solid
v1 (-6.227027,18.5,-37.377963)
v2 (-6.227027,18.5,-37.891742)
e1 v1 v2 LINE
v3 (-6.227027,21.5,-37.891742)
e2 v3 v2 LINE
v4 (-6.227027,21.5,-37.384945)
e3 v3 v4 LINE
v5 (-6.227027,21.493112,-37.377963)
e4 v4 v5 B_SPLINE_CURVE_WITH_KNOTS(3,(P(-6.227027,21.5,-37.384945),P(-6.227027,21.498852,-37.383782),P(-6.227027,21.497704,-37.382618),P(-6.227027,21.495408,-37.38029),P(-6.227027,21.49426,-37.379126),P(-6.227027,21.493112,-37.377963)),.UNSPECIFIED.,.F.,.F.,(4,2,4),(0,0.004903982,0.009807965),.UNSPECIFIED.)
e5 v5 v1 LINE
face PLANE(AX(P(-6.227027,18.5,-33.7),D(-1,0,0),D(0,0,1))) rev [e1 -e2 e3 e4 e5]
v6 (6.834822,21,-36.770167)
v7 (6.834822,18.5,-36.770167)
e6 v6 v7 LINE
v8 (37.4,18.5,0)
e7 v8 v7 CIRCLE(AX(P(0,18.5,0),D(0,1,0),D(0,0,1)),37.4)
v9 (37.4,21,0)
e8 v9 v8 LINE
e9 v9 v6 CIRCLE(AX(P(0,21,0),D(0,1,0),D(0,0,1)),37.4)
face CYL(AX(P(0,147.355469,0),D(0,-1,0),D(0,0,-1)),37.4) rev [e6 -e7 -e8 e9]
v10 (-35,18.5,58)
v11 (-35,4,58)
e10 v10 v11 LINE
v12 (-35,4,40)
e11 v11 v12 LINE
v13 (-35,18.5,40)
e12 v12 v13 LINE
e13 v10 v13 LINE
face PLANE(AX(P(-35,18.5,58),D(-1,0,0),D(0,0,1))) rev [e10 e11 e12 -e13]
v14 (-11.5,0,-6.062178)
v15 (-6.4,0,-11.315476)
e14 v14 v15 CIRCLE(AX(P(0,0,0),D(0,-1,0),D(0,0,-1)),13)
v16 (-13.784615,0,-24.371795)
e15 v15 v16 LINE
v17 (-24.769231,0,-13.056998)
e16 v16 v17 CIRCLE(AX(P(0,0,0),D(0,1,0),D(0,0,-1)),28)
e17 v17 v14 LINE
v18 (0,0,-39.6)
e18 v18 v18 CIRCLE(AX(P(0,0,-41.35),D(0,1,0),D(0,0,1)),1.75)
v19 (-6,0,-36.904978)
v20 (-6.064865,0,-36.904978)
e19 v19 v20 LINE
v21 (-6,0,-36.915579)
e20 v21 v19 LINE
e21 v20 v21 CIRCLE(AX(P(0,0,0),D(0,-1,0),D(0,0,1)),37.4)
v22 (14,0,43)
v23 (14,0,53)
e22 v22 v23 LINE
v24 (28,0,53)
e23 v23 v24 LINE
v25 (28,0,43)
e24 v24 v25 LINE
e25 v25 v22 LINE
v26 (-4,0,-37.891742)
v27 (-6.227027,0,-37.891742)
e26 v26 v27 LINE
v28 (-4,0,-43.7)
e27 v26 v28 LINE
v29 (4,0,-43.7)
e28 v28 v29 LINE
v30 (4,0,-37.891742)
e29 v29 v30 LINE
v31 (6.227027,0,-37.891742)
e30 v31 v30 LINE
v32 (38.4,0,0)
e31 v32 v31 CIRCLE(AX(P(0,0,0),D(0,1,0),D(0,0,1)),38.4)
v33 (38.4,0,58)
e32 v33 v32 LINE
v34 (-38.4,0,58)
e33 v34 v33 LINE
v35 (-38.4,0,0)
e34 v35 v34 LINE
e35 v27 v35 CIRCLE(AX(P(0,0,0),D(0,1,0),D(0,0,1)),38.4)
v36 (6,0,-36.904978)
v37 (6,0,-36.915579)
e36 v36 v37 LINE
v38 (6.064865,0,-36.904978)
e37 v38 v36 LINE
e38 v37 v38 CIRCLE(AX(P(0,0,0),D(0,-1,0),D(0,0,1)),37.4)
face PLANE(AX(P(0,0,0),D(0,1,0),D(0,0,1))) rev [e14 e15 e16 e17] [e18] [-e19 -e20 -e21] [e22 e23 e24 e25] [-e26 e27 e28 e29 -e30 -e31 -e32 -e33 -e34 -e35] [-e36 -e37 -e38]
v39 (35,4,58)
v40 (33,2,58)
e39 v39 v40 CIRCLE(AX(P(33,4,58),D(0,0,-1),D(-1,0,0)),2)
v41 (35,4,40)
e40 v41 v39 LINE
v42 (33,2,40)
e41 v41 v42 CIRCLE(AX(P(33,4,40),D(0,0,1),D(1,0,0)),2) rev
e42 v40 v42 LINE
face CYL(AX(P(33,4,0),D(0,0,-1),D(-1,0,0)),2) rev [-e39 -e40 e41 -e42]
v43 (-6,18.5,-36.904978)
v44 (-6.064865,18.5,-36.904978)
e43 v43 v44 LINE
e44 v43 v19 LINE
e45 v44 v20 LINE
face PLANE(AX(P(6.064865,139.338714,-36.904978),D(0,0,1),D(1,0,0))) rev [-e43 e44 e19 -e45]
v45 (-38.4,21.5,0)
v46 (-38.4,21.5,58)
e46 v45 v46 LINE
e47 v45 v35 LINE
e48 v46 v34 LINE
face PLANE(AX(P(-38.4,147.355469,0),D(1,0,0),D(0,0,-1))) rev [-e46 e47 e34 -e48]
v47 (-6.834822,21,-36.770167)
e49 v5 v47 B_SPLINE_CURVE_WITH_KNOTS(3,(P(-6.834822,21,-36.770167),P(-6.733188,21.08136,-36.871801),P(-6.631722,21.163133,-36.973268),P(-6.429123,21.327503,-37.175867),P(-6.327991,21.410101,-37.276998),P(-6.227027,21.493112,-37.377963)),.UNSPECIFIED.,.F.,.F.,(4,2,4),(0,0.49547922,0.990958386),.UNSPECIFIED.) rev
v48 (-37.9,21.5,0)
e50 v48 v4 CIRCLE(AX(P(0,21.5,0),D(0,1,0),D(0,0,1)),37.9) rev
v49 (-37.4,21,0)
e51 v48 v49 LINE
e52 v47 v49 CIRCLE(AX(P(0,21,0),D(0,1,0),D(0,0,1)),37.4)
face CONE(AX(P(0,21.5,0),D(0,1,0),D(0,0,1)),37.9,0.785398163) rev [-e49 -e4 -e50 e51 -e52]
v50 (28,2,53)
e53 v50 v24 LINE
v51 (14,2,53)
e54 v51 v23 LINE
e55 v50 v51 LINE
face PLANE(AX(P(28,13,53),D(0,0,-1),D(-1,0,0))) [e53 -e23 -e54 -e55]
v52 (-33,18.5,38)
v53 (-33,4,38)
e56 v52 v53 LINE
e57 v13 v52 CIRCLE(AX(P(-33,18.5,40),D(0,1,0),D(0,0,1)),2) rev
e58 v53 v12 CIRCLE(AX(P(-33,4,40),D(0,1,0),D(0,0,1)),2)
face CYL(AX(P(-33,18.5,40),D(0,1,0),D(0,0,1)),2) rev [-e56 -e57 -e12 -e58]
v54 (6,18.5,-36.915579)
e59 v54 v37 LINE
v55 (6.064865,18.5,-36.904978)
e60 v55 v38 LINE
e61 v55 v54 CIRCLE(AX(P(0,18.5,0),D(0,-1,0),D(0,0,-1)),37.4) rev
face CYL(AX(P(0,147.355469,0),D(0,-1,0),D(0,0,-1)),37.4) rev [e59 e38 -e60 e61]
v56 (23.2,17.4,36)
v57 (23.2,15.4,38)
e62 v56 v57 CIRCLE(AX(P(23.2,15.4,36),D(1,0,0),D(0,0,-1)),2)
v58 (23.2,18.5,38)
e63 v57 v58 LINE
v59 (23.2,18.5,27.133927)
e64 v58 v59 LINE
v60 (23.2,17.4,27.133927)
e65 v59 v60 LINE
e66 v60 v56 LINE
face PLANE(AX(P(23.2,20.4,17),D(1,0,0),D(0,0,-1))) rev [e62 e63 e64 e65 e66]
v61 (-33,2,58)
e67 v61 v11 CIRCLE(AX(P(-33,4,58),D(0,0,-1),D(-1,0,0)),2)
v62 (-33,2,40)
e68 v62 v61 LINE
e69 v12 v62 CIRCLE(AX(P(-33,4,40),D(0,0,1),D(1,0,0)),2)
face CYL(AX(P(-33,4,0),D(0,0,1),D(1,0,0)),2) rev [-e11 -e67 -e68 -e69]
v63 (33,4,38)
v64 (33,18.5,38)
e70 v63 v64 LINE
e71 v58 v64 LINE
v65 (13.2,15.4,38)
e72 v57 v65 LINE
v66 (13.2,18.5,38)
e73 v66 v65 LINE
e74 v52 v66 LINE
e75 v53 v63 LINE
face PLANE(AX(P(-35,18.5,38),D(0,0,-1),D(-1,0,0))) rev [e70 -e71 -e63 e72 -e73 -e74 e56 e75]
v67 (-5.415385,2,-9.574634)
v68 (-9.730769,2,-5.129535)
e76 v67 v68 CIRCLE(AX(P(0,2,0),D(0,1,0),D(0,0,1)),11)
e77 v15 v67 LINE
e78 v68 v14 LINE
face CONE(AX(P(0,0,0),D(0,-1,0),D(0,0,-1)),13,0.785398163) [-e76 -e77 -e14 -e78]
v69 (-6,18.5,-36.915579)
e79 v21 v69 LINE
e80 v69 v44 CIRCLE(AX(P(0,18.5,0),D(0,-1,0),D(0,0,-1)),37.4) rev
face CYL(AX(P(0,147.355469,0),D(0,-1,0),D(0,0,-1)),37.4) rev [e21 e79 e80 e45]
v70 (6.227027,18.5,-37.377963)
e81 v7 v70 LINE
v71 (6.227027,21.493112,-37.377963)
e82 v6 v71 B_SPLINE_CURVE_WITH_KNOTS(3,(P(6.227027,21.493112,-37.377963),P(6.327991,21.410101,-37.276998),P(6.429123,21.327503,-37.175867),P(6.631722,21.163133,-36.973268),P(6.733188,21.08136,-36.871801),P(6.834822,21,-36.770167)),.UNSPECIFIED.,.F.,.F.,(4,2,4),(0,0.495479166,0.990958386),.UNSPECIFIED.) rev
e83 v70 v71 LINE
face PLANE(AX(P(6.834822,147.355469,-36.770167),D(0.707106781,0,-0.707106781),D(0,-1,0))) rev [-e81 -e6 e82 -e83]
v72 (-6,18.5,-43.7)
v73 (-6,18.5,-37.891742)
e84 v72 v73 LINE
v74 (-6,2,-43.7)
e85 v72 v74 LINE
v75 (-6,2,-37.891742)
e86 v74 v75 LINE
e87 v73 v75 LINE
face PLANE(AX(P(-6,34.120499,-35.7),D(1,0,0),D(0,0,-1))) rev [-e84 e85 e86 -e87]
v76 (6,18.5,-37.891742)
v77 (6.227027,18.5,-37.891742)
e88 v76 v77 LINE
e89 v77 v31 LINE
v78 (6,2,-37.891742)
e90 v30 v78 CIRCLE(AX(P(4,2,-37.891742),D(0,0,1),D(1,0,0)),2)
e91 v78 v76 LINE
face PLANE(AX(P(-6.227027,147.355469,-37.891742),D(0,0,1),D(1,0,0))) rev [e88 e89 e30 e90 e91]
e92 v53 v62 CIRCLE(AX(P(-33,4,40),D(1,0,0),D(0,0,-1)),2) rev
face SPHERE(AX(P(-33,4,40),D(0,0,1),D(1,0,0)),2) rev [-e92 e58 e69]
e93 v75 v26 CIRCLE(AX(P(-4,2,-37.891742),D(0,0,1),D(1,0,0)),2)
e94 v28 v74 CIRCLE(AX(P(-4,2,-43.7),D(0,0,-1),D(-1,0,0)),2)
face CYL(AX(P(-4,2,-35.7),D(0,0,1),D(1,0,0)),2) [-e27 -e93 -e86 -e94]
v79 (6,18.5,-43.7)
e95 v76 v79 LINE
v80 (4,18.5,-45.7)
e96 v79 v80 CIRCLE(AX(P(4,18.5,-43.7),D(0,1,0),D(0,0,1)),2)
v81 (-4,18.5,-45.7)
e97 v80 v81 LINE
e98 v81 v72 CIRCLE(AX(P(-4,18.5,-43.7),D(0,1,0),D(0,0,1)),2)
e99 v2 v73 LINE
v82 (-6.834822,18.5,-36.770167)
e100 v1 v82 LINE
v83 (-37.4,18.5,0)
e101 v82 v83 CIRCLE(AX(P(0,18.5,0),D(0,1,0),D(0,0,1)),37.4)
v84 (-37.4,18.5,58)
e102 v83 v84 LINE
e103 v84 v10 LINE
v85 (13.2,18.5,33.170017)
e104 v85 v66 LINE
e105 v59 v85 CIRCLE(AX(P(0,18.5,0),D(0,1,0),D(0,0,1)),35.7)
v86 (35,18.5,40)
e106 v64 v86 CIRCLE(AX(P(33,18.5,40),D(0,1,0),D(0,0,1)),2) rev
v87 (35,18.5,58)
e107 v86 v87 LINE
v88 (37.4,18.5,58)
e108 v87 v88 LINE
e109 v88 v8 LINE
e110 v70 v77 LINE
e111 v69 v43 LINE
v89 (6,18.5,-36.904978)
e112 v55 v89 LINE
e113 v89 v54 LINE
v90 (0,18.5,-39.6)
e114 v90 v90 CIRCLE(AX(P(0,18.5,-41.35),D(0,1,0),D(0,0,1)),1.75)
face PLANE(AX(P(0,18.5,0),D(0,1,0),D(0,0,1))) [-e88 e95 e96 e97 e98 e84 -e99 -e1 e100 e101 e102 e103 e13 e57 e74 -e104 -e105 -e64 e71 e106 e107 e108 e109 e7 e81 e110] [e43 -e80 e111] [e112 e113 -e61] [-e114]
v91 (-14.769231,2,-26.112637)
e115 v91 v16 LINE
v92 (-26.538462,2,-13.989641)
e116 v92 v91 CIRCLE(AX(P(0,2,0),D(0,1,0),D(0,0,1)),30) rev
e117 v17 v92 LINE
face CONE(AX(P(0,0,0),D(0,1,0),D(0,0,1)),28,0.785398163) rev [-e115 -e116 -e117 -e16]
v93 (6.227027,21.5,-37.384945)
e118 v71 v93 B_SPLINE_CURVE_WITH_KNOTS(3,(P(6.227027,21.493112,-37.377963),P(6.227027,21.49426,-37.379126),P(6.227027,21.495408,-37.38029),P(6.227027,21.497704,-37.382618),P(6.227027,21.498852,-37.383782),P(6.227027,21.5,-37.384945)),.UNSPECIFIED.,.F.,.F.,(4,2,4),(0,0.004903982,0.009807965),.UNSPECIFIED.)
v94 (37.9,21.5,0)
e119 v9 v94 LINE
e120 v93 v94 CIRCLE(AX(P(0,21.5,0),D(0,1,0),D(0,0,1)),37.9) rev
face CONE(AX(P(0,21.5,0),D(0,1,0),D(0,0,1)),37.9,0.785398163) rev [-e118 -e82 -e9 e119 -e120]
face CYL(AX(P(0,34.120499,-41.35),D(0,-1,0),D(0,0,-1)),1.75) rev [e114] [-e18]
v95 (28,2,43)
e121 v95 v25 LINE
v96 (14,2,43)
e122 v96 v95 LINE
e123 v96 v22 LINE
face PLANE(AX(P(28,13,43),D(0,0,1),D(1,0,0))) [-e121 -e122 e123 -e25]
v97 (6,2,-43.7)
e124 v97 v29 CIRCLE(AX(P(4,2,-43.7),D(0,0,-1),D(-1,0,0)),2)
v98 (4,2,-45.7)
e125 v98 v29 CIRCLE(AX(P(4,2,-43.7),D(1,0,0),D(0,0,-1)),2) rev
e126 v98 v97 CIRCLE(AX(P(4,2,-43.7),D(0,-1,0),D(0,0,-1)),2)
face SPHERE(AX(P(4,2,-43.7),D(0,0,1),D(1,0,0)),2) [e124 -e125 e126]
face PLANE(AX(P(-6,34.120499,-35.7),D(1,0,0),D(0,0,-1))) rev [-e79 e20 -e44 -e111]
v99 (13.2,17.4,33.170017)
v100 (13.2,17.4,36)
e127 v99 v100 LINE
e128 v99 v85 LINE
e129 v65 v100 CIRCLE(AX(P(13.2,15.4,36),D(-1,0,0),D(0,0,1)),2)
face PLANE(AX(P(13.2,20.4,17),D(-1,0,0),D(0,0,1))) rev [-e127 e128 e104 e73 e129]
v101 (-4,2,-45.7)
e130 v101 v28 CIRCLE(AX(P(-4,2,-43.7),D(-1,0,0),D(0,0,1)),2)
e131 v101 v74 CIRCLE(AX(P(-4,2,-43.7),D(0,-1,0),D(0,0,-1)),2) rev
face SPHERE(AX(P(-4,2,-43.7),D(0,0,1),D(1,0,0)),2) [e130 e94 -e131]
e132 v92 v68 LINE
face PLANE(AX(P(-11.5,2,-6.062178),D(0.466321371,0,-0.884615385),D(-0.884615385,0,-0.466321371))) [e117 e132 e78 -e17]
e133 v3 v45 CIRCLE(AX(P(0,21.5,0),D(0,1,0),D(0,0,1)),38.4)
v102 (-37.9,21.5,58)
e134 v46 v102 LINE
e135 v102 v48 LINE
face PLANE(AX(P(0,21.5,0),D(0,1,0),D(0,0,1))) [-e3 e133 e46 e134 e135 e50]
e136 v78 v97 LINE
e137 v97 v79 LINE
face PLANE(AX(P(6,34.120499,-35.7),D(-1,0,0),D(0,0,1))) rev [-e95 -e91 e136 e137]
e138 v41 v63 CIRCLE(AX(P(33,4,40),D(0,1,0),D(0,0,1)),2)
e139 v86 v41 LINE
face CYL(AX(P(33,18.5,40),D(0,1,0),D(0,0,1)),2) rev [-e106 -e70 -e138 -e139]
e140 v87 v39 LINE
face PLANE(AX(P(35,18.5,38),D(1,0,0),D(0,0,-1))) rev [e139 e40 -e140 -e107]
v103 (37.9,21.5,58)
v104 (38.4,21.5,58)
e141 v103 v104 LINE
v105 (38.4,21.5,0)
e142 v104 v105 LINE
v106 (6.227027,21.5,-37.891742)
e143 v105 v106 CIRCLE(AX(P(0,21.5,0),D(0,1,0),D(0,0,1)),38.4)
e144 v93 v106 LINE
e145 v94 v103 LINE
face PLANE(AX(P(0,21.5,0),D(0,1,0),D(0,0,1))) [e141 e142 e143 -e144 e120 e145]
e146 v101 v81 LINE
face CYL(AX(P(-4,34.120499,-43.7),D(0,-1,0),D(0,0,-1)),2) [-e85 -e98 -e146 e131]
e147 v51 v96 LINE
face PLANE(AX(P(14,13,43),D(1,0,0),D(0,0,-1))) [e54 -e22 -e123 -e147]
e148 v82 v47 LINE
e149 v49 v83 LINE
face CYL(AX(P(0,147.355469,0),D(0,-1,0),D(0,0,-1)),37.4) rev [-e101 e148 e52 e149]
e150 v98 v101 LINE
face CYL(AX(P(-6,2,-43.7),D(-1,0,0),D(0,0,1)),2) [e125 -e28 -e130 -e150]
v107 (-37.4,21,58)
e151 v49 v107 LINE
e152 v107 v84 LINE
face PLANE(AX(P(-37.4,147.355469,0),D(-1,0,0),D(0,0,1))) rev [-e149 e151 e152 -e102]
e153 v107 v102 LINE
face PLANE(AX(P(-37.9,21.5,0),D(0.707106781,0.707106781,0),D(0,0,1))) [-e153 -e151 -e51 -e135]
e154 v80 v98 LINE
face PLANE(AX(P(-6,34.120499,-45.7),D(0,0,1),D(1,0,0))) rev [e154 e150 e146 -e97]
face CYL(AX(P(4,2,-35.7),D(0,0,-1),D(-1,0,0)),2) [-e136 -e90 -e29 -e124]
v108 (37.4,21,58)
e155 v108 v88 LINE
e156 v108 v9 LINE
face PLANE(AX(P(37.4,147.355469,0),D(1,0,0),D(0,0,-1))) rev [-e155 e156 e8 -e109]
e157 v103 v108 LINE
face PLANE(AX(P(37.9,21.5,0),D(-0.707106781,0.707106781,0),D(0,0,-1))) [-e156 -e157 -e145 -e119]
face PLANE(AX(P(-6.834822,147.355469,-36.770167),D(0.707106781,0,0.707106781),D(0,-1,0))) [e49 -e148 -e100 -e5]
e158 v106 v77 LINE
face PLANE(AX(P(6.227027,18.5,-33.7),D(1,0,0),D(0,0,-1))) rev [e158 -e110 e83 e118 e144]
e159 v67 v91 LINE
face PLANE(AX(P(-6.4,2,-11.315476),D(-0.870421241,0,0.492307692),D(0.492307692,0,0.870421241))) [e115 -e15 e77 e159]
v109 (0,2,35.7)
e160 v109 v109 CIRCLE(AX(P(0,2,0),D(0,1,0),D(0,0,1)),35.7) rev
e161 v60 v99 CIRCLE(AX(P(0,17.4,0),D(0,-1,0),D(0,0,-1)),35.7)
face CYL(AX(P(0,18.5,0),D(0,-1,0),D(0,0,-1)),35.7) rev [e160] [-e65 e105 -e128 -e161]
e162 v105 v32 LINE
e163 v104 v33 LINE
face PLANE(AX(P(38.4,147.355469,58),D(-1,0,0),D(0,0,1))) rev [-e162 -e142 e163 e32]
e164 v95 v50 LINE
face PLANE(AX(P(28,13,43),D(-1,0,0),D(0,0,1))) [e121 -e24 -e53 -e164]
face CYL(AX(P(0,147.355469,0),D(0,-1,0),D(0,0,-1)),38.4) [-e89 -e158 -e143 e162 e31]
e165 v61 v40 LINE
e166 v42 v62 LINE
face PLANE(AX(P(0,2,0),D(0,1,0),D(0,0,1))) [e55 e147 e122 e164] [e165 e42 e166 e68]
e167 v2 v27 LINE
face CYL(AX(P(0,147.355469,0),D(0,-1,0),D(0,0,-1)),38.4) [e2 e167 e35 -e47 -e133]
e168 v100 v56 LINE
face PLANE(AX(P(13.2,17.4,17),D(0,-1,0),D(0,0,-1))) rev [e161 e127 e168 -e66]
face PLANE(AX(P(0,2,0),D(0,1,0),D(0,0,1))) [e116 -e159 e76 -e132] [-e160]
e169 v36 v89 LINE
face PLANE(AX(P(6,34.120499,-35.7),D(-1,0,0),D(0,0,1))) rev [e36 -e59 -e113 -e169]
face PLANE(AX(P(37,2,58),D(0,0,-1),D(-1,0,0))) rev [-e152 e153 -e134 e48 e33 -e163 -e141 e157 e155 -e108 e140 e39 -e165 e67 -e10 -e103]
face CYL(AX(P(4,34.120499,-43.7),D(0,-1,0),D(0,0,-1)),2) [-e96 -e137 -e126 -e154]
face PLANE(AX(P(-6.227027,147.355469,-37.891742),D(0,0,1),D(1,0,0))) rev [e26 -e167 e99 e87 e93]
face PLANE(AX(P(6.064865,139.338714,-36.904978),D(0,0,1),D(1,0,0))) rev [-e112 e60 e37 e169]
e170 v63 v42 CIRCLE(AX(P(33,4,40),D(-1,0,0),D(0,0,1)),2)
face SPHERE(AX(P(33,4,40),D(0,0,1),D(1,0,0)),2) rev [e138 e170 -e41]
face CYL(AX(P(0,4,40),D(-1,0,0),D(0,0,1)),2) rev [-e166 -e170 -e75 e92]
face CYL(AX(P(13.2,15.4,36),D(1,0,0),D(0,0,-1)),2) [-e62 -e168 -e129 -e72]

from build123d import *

# Parameters (mm, degrees)
BOSS_EXTRUDE1_DEPTH = 2
SKETCH3_R           = 35.7
BOSS_EXTRUDE2_DEPTH = 18.5
SKETCH5_W           = 12
SKETCH5_H           = 10
SKETCH5_R           = 1.75
BOSS_EXTRUDE3_DEPTH = 18.5
SKETCH6_R           = 36.4
BOSS_EXTRUDE5_DEPTH = 18.5
BOSS_EXTRUDE6_DEPTH = 21.5
SKETCH8_W           = 12.454054054
SKETCH8_H           = 5
CUT_EXTRUDE1_DEPTH  = 12
SKETCH9_W           = 10
SKETCH9_H           = 3
CUT_EXTRUDE2_DEPTH  = 21
CHAMFER1_SIZE       = 0.5
FILLET1_R           = 2
CHAMFER2_SIZE       = 2
SKETCH10_W          = 14
SKETCH10_H          = 10
CUT_EXTRUDE3_DEPTH  = 13


# Some blends are built 0.0001 mm under size
with BuildPart() as part:
    # Sketch4 → Boss-Extrude1 (new body)
    with BuildSketch(Plane(origin=(0, 0, 0), x_dir=(1, 0, 0), z_dir=(0, 1, 0))):
        with BuildLine():
            Line((37, 0), (37, -58))
            Line((37, -58), (-37, -58))
            Line((-37, -58), (-37, 0))
            ThreePointArc((-37, 0), (0, 37), (37, 0))
        make_face()
        with BuildLine():
            Line((-11.5, 6.062177826), (-24.769230769, 13.056998396))
            ThreePointArc((-24.769230769, 13.056998396), (-20.089945679, 19.503694076), (-13.784615385, 24.371794737))
            Line((-13.784615385, 24.371794737), (-6.4, 11.315476128))
            ThreePointArc((-6.4, 11.315476128), (-9.327474779, 9.055286535), (-11.5, 6.062177826))
        make_face(mode=Mode.SUBTRACT)
    extrude(amount=BOSS_EXTRUDE1_DEPTH)

    # Sketch3 → Boss-Extrude2 (add)
    with BuildSketch(Plane(origin=(0, 0, 0), x_dir=(1, 0, 0), z_dir=(0, 1, 0))):
        with BuildLine():
            Line((-37, 0), (-37, -58))
            Line((-37, -58), (-35, -58))
            Line((-35, -58), (-35, -38))
            Line((-35, -38), (35, -38))
            Line((35, -38), (35, -58))
            Line((35, -58), (37, -58))
            Line((37, -58), (37, 0))
            ThreePointArc((37, 0), (0, 37), (-37, 0))
        make_face()
        with Locations(Location((0, 0, 0), (0, 0, 270))):
            Circle(SKETCH3_R, mode=Mode.SUBTRACT)
    extrude(amount=BOSS_EXTRUDE2_DEPTH)

    # Sketch5 → Boss-Extrude3 (add)
    with BuildSketch(Plane(origin=(0, 0, 0), x_dir=(1, 0, 0), z_dir=(0, 1, 0))):
        with Locations((0, 40.7)):
            Rectangle(SKETCH5_W, SKETCH5_H)
        with Locations(Location((0, 41.35, 0), (0, 0, 270))):
            Circle(SKETCH5_R, mode=Mode.SUBTRACT)
    extrude(amount=BOSS_EXTRUDE3_DEPTH)

    # Sketch6 → Boss-Extrude5 (add)
    with BuildSketch(Plane(origin=(0, 0, 0), x_dir=(-1, 0, 0), z_dir=(0, 1, 0))):
        with BuildLine():
            Line((37.4, 0), (37.4, 58))
            Line((37.4, 58), (35, 58))
            Line((35, 58), (35, 38))
            Line((35, 38), (-35, 38))
            Line((-35, 38), (-35, 58))
            Line((-35, 58), (-37.4, 58))
            Line((-37.4, 58), (-37.4, 0))
            ThreePointArc((-37.4, 0), (-28.50952425, -24.206755814), (-6.064864865, -36.904978176))
            Line((-6.064864865, -36.904978176), (6.064864865, -36.904978176))
            ThreePointArc((6.064864865, -36.904978176), (28.50952425, -24.206755814), (37.4, 0))
        make_face()
        Circle(SKETCH6_R, mode=Mode.SUBTRACT)
    extrude(amount=BOSS_EXTRUDE5_DEPTH)

    # Sketch7 → Boss-Extrude6 (add)
    with BuildSketch(Plane(origin=(0, 0, 0), x_dir=(1, 0, 0), z_dir=(0, 1, 0))):
        with BuildLine():
            Line((37.4, 0), (37.4, -58))
            Line((37.4, -58), (38.4, -58))
            Line((38.4, -58), (38.4, 0))
            ThreePointArc((38.4, 0), (29.271810995, 24.853995274), (6.227027027, 37.891742298))
            Line((6.227027027, 37.891742298), (-6.227027027, 37.891742298))
            ThreePointArc((-6.227027027, 37.891742298), (-29.271810995, 24.853995274), (-38.4, 0))
            Line((-38.4, 0), (-38.4, -58))
            Line((-38.4, -58), (-37.4, -58))
            Line((-37.4, -58), (-37.4, 0))
            ThreePointArc((-37.4, 0), (0, 37.4), (37.4, 0))
        make_face()
    extrude(amount=BOSS_EXTRUDE6_DEPTH)

    # Sketch8 → Cut-Extrude1 (cut)
    with BuildSketch(Plane(origin=(0, 0, -45.7), x_dir=(-1, 0, 0), z_dir=(0, 0, -1))):
        with Locations((0, 21)):
            Rectangle(SKETCH8_W, SKETCH8_H)
    extrude(amount=-CUT_EXTRUDE1_DEPTH, mode=Mode.SUBTRACT)

    # Sketch9 → Cut-Extrude2 (cut)
    with BuildSketch(Plane.XY.offset(38)):
        with Locations((18.2, 18.9)):
            Rectangle(SKETCH9_W, SKETCH9_H)
    extrude(amount=-CUT_EXTRUDE2_DEPTH, mode=Mode.SUBTRACT)

    # Chamfer1
    # the kernel refuses this chamfer: 0.610095567, 0.5 mm, written as the material it takes off along each edge
    with BuildSketch(Plane(origin=(6.227027027, 23.093595243, -36.87796272), x_dir=(0, 0, -1), z_dir=(0, -1, 0))) as chamfer1_piece_1:
        with BuildLine():
            Line((CHAMFER1_SIZE, 0), (-0.10779544, 0.60779544))
            ThreePointArc((-0.10779544, 0.60779544), (-0.054392136, 0.313970558), (0, 0))
            Line((0, 0), (CHAMFER1_SIZE, 0))
        make_face()
    extrude(amount=4.593595243, mode=Mode.SUBTRACT)
    with BuildSketch(Plane(origin=(-6.227027027, 23.093595243, -36.87796272), x_dir=(-0.9846341969659582, 0, 0.17462960277456552), z_dir=(0, -1, 0))) as chamfer1_piece_2:
        with BuildLine():
            Line((0.61728045, 0), (-CHAMFER1_SIZE * 0.174629602775, CHAMFER1_SIZE * 0.984634196966))
            Line((-CHAMFER1_SIZE * 0.174629602775, CHAMFER1_SIZE * 0.984634196966), (0, 0))
            ThreePointArc((0, 0), (0.318644625, 0.001272197), (0.61728045, 0))
        make_face()
    extrude(amount=4.593595243, mode=Mode.SUBTRACT)
    # the kernel refuses this chamfer: 0.610095567, 0.5 mm, written as the material it takes off along each edge
    with BuildSketch(Plane(origin=(-37.4, 21.5, 59.285841494), x_dir=(-1, 0, 0), z_dir=(0, 0, -1)), Plane(origin=(37.4, 21.5, 0), x_dir=(1, 0, 0), z_dir=(0, 0, 1))) as chamfer1_2_piece_1:
        Polygon((CHAMFER1_SIZE, 0), (0, -CHAMFER1_SIZE), (0, 0), align=None)
    extrude(amount=59.285841494, mode=Mode.SUBTRACT)
    with BuildSketch(Plane(origin=(0, 21.5, 0), x_dir=(-1, 0, 0), z_dir=(0, 0, 1))) as chamfer1_2_piece_2:
        Polygon((37.4 + CHAMFER1_SIZE, 0), (37.4, CHAMFER1_SIZE), (37.4, 0), align=None)
    revolve(axis=Axis((0, 21.5, 0), (0, -1, 0)), revolution_arc=81.44055325, mode=Mode.SUBTRACT)
    with BuildSketch(Plane(origin=(0, 21.5, 0), x_dir=(0.14883547640098224, 0, -0.9888619726556849), z_dir=(-0.9888619726556849, 0, -0.14883547640098224))) as chamfer1_2_piece_3:
        Polygon((37.4 + CHAMFER1_SIZE, 0), (37.4, CHAMFER1_SIZE), (37.4, 0), align=None)
    revolve(axis=Axis((0, 21.5, 0), (0, -1, 0)), revolution_arc=81.44055325, mode=Mode.SUBTRACT)

    # Fillet1
    fillet1_edges = [part.edges().sort_by_distance(p)[0] for p in [
        (6, 0, -41.795871149),
        (18.2, 17.4, 38),
        (0, 2, 38),
        (-35, 2, 48),
        (35, 2, 48),
        (-35, 10.25, 38),
        (35, 10.25, 38),
        (-6, 0, -41.795871149),
        (-6, 9.25, -45.7),
        (6, 9.25, -45.7),
        (0, 0, -45.7),
    ]]
    fillet(fillet1_edges, radius=FILLET1_R)

    # Chamfer2
    chamfer2_edges = [part.edges().sort_by_distance(p)[0] for p in [
        (-20.089945679, 2, -19.503694076),
        (-9.327474779, 2, -9.055286535),
    ]]
    chamfer(chamfer2_edges, length=CHAMFER2_SIZE - 0.0001)  # a hair under: the kernel refuses the full size

    # Sketch10 → Cut-Extrude3 (cut)
    with BuildSketch(Plane(origin=(0, 0, 0), x_dir=(1, 0, 0), z_dir=(0, 1, 0))):
        with Locations((21, -48)):
            Rectangle(SKETCH10_W, SKETCH10_H)
    extrude(amount=CUT_EXTRUDE3_DEPTH, mode=Mode.SUBTRACT)


solid = part.part
